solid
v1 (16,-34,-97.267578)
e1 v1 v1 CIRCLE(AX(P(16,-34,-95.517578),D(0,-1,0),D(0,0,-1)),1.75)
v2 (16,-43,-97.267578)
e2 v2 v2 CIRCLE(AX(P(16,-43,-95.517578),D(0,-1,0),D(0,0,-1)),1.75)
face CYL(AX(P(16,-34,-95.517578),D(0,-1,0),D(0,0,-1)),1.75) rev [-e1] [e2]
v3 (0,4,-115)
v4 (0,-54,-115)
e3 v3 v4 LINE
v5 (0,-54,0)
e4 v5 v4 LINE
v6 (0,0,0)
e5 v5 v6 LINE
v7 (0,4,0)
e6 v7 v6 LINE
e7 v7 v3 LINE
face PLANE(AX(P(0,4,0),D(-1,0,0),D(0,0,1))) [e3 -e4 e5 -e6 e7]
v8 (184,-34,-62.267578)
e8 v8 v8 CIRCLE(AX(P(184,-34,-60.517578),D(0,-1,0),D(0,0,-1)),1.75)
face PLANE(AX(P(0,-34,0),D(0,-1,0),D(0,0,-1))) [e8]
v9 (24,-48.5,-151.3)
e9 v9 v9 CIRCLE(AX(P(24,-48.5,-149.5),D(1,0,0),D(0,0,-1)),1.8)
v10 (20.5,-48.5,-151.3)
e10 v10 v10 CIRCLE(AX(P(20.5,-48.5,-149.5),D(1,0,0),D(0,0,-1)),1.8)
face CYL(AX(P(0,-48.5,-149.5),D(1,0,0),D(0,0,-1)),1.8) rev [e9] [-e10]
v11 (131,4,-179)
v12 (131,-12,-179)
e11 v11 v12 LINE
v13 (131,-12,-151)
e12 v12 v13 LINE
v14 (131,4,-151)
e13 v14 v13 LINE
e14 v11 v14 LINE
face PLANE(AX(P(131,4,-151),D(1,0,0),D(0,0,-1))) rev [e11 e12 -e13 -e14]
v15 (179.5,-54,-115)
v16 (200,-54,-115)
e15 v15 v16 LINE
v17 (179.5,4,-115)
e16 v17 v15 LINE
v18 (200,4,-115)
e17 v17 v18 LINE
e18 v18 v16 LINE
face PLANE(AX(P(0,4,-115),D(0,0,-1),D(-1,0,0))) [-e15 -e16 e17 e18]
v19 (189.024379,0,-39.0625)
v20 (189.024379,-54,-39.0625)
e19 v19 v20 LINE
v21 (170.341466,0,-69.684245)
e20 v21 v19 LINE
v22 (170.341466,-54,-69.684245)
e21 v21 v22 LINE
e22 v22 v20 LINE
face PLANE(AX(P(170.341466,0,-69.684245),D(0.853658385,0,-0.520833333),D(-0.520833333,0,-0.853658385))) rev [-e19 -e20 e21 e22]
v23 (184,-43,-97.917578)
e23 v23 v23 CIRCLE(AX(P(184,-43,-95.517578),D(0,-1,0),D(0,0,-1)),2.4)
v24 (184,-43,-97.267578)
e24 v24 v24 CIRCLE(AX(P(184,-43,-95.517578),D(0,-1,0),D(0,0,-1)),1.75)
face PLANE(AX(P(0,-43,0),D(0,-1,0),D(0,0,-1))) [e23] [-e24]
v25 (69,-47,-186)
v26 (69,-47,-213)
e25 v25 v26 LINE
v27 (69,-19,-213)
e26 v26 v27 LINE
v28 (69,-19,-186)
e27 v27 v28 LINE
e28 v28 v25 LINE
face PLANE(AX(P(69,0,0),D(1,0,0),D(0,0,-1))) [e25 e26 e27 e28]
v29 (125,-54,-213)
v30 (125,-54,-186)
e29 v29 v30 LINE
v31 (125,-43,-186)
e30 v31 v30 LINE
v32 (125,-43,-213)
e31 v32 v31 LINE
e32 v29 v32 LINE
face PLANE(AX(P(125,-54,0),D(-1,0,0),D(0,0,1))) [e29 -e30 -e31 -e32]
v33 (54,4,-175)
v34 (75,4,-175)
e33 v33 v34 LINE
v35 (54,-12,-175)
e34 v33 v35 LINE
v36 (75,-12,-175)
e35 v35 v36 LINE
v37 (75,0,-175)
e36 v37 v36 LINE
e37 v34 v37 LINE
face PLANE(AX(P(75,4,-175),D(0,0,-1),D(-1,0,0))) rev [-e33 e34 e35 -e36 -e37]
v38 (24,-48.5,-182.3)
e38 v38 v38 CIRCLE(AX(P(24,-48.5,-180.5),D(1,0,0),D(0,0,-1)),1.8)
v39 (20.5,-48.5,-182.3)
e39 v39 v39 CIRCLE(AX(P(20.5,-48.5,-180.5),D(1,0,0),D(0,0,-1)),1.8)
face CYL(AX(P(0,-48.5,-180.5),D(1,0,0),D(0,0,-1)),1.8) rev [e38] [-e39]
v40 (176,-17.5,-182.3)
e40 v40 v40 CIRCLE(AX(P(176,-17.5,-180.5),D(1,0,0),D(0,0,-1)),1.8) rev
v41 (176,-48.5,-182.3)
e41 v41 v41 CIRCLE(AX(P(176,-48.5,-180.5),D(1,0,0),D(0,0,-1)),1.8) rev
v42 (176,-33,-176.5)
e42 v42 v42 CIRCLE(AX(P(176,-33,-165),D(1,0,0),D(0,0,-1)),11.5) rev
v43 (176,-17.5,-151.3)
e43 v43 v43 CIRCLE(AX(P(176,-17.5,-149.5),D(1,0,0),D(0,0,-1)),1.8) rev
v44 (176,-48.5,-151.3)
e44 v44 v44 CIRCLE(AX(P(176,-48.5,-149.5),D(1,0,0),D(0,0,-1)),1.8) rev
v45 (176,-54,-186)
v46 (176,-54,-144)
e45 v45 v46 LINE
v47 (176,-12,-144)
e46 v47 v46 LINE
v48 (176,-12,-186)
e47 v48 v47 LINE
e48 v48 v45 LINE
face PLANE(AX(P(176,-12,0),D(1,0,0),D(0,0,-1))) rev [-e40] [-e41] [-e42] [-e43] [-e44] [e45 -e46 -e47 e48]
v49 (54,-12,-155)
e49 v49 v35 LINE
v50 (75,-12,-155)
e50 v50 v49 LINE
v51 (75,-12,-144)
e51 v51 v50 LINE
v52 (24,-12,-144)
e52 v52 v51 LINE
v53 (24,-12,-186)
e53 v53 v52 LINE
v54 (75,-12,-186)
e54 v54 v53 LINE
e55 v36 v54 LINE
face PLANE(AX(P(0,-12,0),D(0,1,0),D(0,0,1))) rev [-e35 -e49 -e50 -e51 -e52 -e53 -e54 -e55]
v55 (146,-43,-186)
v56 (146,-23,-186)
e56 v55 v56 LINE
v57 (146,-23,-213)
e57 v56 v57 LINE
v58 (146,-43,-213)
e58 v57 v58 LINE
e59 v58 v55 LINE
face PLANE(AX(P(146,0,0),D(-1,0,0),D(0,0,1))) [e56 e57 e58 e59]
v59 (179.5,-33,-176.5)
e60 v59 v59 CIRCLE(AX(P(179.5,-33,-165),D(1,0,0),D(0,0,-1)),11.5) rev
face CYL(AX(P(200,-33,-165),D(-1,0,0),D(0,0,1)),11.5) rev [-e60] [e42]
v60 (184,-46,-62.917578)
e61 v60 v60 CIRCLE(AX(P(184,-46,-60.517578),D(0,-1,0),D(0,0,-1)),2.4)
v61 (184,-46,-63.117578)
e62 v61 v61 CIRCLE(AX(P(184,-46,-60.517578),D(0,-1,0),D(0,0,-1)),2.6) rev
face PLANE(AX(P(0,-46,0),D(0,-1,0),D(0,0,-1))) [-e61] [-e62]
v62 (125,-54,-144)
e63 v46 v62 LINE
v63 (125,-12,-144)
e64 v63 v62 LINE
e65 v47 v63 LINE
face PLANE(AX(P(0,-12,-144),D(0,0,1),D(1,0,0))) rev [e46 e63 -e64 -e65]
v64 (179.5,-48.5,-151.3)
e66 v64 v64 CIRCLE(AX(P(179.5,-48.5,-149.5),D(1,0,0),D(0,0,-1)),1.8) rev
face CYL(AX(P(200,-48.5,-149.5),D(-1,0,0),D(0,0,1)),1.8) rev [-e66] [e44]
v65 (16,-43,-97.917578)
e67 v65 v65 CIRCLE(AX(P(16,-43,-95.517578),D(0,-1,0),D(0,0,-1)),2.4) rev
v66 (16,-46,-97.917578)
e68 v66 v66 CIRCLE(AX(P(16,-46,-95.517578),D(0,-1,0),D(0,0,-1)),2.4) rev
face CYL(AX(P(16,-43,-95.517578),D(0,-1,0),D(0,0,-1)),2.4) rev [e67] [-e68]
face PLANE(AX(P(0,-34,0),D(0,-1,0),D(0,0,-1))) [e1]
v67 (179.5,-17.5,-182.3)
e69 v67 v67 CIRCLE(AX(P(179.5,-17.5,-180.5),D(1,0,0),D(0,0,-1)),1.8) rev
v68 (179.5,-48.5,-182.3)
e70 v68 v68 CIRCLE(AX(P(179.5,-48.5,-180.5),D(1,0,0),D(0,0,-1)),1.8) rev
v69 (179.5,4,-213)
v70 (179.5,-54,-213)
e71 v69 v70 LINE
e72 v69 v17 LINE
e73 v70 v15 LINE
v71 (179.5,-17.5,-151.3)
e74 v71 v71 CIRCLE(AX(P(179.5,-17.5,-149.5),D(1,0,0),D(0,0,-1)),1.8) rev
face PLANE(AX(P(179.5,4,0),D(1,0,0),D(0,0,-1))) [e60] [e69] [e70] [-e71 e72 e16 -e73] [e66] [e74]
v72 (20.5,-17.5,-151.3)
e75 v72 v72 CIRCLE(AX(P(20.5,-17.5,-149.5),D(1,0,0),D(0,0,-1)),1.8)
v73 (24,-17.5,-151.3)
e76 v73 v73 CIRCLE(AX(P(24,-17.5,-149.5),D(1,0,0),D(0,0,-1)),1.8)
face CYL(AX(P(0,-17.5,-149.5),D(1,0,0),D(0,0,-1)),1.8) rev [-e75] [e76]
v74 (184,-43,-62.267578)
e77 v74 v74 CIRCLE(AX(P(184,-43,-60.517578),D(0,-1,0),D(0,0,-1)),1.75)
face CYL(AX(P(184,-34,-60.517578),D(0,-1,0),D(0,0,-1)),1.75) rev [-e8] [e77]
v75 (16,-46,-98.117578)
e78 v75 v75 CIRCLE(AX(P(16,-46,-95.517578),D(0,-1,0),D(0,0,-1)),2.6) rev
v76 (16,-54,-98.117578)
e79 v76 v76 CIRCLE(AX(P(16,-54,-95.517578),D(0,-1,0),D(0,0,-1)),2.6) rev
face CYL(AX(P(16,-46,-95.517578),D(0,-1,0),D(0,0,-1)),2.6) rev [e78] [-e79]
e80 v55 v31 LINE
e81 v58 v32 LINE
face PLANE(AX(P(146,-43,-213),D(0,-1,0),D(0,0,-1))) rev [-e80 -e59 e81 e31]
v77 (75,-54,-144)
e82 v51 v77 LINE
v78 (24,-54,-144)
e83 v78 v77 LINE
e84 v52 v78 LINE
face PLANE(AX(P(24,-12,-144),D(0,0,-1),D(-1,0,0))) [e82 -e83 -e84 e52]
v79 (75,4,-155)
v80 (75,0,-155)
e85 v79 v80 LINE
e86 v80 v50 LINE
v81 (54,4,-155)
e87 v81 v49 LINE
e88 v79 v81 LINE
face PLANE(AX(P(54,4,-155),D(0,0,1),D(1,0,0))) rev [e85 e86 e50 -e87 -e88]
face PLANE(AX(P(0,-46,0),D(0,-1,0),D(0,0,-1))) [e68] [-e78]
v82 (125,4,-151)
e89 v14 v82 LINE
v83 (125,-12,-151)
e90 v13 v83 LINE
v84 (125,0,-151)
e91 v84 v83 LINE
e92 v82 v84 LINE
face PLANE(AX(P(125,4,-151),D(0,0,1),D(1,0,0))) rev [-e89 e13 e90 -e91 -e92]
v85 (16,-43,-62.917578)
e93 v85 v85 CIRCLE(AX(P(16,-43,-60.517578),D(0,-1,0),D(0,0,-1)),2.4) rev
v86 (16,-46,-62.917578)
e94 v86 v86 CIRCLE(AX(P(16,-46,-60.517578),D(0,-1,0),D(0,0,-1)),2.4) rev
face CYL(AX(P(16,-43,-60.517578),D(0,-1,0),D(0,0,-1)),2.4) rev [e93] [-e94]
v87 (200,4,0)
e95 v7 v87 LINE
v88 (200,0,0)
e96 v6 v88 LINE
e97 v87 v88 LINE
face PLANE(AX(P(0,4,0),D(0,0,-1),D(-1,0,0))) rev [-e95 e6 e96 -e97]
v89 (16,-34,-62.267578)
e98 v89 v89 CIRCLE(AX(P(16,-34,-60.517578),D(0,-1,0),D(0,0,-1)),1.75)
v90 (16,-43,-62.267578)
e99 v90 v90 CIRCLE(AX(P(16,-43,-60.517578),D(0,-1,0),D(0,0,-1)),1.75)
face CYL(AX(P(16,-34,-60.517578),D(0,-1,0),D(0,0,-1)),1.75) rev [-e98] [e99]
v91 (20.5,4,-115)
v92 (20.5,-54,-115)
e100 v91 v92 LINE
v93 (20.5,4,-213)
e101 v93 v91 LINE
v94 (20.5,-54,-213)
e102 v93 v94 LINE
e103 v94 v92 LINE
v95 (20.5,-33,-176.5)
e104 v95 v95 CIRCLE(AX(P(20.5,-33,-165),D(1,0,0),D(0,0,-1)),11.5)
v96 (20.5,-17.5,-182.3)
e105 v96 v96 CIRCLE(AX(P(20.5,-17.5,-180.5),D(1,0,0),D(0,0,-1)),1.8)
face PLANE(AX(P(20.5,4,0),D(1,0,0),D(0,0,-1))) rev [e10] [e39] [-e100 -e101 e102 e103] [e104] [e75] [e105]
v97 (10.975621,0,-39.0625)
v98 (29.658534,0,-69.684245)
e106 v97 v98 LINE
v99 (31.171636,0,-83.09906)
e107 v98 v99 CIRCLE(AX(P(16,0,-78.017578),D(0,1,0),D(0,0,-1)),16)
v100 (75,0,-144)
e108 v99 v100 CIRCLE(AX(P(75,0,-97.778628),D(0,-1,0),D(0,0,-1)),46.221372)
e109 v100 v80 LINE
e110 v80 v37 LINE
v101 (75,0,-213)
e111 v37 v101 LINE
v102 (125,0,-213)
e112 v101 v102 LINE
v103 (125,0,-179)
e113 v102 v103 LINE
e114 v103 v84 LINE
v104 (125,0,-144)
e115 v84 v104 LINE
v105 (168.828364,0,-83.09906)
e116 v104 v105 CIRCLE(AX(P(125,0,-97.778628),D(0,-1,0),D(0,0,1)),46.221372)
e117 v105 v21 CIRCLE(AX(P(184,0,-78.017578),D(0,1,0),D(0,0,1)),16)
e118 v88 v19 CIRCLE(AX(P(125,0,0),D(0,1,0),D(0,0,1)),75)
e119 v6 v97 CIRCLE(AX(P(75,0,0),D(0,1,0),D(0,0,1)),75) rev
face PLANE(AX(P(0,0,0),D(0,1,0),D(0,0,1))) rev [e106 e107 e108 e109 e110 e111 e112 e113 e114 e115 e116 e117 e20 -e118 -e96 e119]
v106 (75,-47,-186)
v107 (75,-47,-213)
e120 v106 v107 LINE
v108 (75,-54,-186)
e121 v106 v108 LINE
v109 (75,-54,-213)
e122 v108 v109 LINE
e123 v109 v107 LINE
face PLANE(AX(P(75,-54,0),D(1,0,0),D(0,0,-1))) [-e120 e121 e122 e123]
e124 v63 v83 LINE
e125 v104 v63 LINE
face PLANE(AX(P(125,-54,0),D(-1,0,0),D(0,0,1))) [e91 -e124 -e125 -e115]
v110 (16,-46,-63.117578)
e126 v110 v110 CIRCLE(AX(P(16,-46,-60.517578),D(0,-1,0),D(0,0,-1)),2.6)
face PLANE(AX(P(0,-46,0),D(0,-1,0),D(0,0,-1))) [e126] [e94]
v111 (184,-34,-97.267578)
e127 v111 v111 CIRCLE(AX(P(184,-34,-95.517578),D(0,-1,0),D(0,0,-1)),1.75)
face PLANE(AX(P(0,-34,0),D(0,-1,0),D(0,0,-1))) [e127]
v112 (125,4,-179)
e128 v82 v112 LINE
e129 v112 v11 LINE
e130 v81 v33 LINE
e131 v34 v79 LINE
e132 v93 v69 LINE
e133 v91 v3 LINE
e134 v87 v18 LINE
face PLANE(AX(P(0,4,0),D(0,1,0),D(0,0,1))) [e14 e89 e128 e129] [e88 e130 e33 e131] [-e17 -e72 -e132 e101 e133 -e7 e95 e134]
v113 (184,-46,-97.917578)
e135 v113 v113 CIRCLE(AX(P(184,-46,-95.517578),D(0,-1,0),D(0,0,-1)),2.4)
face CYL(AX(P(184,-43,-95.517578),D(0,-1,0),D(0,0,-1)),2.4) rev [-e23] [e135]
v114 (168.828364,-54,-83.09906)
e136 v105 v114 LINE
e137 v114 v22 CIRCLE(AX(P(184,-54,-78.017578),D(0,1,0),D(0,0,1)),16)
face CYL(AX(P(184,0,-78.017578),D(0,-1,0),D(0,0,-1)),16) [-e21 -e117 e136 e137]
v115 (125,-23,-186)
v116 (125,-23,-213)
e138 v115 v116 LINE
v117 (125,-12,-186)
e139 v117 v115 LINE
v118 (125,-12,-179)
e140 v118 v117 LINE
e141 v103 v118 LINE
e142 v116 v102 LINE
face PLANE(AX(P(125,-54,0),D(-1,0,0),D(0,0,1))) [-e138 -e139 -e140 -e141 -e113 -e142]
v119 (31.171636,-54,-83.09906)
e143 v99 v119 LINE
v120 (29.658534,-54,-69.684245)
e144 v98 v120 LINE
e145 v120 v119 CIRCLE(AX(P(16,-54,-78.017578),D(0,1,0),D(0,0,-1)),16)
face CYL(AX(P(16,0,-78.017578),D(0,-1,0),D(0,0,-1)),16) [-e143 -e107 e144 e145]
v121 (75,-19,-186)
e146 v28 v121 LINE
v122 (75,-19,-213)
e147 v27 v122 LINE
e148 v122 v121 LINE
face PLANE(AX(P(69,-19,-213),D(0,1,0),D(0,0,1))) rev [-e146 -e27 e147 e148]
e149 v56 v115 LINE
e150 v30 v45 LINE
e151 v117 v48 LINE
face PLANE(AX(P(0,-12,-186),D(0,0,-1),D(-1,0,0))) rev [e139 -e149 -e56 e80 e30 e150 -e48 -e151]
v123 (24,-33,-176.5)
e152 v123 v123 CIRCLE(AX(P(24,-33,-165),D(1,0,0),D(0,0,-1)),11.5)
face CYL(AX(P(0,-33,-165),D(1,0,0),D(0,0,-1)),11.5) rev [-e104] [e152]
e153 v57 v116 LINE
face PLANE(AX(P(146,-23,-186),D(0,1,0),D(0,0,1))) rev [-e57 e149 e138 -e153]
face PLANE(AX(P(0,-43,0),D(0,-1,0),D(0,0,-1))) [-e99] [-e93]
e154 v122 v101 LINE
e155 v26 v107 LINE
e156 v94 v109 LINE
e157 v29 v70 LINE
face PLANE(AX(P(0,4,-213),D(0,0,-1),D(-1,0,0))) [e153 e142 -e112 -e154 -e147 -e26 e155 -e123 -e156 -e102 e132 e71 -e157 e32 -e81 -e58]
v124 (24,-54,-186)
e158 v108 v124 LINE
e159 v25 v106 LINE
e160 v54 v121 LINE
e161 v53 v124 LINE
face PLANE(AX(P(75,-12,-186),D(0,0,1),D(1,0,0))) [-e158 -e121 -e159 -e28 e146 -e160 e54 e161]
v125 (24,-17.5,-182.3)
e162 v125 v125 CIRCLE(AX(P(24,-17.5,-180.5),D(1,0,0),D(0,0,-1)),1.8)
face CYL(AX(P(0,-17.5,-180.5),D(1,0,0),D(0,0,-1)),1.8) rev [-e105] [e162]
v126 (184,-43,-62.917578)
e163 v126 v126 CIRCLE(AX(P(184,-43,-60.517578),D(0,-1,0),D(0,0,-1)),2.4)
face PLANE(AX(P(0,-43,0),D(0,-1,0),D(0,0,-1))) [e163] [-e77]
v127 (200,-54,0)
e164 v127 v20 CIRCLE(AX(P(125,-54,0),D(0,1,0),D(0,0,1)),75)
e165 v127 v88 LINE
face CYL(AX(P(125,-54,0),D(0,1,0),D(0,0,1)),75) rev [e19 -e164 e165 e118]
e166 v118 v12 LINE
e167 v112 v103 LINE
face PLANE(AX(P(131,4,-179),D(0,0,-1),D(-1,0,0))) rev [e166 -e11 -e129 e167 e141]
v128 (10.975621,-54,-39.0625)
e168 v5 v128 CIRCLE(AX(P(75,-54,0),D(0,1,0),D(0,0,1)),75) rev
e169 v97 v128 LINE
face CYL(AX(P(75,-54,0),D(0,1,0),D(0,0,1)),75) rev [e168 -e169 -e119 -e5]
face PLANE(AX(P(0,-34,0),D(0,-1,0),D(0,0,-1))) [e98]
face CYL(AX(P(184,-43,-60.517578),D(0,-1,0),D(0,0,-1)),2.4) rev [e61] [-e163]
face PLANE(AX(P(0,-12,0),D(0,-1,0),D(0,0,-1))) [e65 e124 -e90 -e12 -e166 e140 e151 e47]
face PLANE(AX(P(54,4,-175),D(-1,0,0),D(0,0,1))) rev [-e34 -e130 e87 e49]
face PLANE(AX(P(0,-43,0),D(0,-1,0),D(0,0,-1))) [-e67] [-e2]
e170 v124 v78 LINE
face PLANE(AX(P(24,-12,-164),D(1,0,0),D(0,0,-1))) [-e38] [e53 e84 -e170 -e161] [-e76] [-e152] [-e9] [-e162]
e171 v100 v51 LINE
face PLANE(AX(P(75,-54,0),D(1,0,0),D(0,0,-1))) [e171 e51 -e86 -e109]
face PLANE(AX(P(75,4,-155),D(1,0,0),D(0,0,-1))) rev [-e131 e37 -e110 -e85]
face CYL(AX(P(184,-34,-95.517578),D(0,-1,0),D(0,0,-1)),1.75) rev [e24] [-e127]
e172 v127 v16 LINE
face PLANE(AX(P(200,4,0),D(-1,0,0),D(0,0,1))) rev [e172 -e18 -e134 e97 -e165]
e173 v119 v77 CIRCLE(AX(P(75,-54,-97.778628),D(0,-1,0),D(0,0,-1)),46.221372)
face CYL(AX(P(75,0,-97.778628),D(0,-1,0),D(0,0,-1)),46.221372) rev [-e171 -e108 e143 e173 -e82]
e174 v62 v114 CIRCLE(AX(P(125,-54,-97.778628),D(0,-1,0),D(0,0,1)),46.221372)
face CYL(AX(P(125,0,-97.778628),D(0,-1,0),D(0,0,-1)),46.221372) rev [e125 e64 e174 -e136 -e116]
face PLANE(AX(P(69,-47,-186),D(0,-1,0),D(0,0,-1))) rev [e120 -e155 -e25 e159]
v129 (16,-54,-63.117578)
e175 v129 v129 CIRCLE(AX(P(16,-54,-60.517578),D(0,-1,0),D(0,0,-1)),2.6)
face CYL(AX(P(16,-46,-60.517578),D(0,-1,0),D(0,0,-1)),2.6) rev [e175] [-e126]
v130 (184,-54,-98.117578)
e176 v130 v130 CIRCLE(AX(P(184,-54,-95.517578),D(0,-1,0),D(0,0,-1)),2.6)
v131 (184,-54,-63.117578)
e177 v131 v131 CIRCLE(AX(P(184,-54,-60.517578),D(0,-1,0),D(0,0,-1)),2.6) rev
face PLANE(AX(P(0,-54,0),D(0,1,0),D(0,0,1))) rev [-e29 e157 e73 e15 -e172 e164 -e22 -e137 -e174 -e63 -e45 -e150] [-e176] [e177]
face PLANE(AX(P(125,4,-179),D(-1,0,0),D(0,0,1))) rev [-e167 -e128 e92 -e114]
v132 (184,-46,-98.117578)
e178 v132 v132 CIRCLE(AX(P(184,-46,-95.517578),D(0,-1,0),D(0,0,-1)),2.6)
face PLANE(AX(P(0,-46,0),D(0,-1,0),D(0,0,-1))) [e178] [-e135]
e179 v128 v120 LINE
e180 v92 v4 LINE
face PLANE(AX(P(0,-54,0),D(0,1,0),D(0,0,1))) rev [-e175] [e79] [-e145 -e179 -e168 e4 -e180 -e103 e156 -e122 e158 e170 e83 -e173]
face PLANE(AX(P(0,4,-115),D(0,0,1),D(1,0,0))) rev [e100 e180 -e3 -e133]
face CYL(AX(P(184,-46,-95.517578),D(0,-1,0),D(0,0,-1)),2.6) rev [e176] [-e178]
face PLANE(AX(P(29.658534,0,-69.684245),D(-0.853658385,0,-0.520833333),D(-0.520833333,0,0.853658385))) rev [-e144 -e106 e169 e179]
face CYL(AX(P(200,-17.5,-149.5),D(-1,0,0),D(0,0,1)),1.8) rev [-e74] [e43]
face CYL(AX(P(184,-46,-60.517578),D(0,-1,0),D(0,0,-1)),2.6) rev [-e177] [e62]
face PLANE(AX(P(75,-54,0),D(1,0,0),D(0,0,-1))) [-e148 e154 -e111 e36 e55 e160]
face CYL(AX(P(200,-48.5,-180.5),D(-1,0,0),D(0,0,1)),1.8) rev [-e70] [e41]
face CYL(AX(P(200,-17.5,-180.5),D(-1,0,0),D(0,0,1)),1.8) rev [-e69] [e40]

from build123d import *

# Parameters (mm, degrees)
SKETCH_1_W           = 200
SKETCH_1_H           = 213
EXTRUDE_1_DEPTH      = 4
EXTRUDE_2_DEPTH      = 54
CUT_EXTRUDE_2_DEPTH  = 298.880848663
CUT_EXTRUDE_3_DEPTH  = 42
SKETCH_7_R           = 1.8
SKETCH_7_R_2         = 11.5
CUT_EXTRUDE_4_DEPTH  = 282.53330176
MIRROR_START         = 176
MIRROR_1_OUTLINE_R   = 1.8
MIRROR_1_OUTLINE_R_2 = 11.5
MIRROR_1_DEPTH       = 3.5
SKETCH_8_W           = 27
SKETCH_8_H           = 28
CUT_EXTRUDE_5_DEPTH  = 6
SKETCH_9_W           = 27
SKETCH_9_H           = 20
CUT_EXTRUDE_6_DEPTH  = 21
CUT_EXTRUDE_START    = -54
CUT_EXTRUDE_7_DEPTH  = 54
SKETCH_14_W          = 21
SKETCH_14_H          = 20
CUT_EXTRUDE_8_DEPTH  = 296.18299409
SKETCH_15_W          = 6
SKETCH_15_H          = 28
CUT_EXTRUDE_9_DEPTH  = 296.18299409
SKETCH_12_R          = 2.6
CUT_EXTRUDE_10_DEPTH = 8
SKETCH_16_R          = 2.4
CUT_EXTRUDE_11_DEPTH = 3
SKETCH_17_R          = 1.75
CUT_EXTRUDE_12_DEPTH = 20


# Read off the part's stored shape, not the designer's step: 镜向1
with BuildPart() as part:
    # 草图1 → 凸台-拉伸1 (new body)
    with BuildSketch(Plane(origin=(0, 0, 0), x_dir=(1, 0, 0), z_dir=(0, 1, 0))):
        with Locations((100, 106.5)):
            Rectangle(SKETCH_1_W, SKETCH_1_H)
    extrude(amount=EXTRUDE_1_DEPTH)

    # 草图1<4> → 凸台-拉伸2 (add)
    with BuildSketch(Plane(origin=(0, 0, 0), x_dir=(1, 0, 0), z_dir=(0, 1, 0))):
        with BuildLine():
            Line((0, 213), (0, 0))
            ThreePointArc((0, 0), (21.966991411, 53.033008589), (75, 75))
            Line((75, 75), (75, 213))
            Line((75, 213), (0, 213))
        make_face()
        with BuildLine():
            Line((125, 213), (125, 75))
            ThreePointArc((125, 75), (178.033008589, 53.033008589), (200, 0))
            Line((200, 0), (200, 213))
            Line((200, 213), (125, 213))
        make_face()
    extrude(amount=-EXTRUDE_2_DEPTH)

    # 草图3 → 切除-拉伸2 (cut, through all)
    with BuildSketch(Plane.XZ.offset(54)):
        Polygon((20.5, -186), (20.5, -165), (20.5, -144), (20.5, -115), (0, -115), (0, -213), (20.5, -213), align=None)
        Polygon((179.5, -115), (200, -115), (200, -213), (179.5, -213), (179.5, -165), align=None)
    extrude(amount=-CUT_EXTRUDE_2_DEPTH, mode=Mode.SUBTRACT)

    # 草图5 → 切除-拉伸3 (cut)
    with BuildSketch(Plane.XZ.offset(54)):
        Polygon((176, -164), (176, -144), (125, -144), (125, -186), (176, -186), align=None)
        Polygon((24, -164), (24, -144), (75, -144), (75, -186), (24, -186), align=None)
    extrude(amount=-CUT_EXTRUDE_3_DEPTH, mode=Mode.SUBTRACT)

    # 草图7 → 切除-拉伸4 (cut, through all)
    with BuildSketch(Plane(origin=(24, 0, 0), x_dir=(0, 0, -1), z_dir=(1, 0, 0))):
        with Locations((180.5, -17.5)):
            Circle(SKETCH_7_R)
        with Locations((149.5, -17.5)):
            Circle(SKETCH_7_R)
        with Locations((165, -33)):
            Circle(SKETCH_7_R_2)
        with Locations((180.5, -48.5)):
            Circle(SKETCH_7_R)
        with Locations((149.5, -48.5)):
            Circle(SKETCH_7_R)
    extrude(amount=-CUT_EXTRUDE_4_DEPTH, mode=Mode.SUBTRACT)

    # 镜向1 outline → 镜向1 (cut)
    with BuildSketch(Plane.YZ.offset(MIRROR_START)):
        with Locations((-17.5, -180.5)):
            Circle(MIRROR_1_OUTLINE_R)
        with Locations((-17.5, -149.5)):
            Circle(MIRROR_1_OUTLINE_R)
        with Locations((-33, -165)):
            Circle(MIRROR_1_OUTLINE_R_2)
        with Locations((-48.5, -180.5)):
            Circle(MIRROR_1_OUTLINE_R)
        with Locations((-48.5, -149.5)):
            Circle(MIRROR_1_OUTLINE_R)
    extrude(amount=MIRROR_1_DEPTH, mode=Mode.SUBTRACT)

    # 草图8 → 切除-拉伸5 (cut)
    with BuildSketch(Plane(origin=(75, 0, 0), x_dir=(0, 0, -1), z_dir=(1, 0, 0))):
        with Locations((199.5, -33)):
            Rectangle(SKETCH_8_W, SKETCH_8_H)
    extrude(amount=-CUT_EXTRUDE_5_DEPTH, mode=Mode.SUBTRACT)

    # 草图9 → 切除-拉伸6 (cut)
    with BuildSketch(Plane.ZY.offset(-125)):
        with Locations((-199.5, -33)):
            Rectangle(SKETCH_9_W, SKETCH_9_H)
    extrude(amount=-CUT_EXTRUDE_6_DEPTH, mode=Mode.SUBTRACT)

    # 草图11 → 切除-拉伸7 (cut)
    with BuildSketch(Plane.XZ.offset(54).offset(CUT_EXTRUDE_START)):
        with BuildLine():
            Line((29.658534166, -69.684244774), (10.975621098, -39.0625))
            ThreePointArc((10.975621098, -39.0625), (38.289562111, -65.401404801), (75, -75))
            Line((75, -75), (75, -144))
            ThreePointArc((75, -144), (37.483837038, -124.777752739), (31.171635941, -83.099060455))
            ThreePointArc((31.171635941, -83.099060455), (31.899182276, -76.224256342), (29.658534166, -69.684244774))
        make_face()
        with BuildLine():
            Line((125, -144), (125, -75))
            ThreePointArc((125, -75), (161.710437889, -65.401404801), (189.024378902, -39.0625))
            Line((189.024378902, -39.0625), (170.341465834, -69.684244774))
            ThreePointArc((170.341465834, -69.684244774), (168.100817724, -76.224256342), (168.828364059, -83.099060455))
            ThreePointArc((168.828364059, -83.099060455), (162.516162962, -124.777752739), (125, -144))
        make_face()
    extrude(amount=CUT_EXTRUDE_7_DEPTH, mode=Mode.SUBTRACT)

    # 草图14 → 切除-拉伸8 (cut, through all)
    with BuildSketch(Plane.XZ.offset(12)):
        with Locations((64.5, -165)):
            Rectangle(SKETCH_14_W, SKETCH_14_H)
    extrude(amount=-CUT_EXTRUDE_8_DEPTH, mode=Mode.SUBTRACT)

    # 草图15 → 切除-拉伸9 (cut, through all)
    with BuildSketch(Plane.XZ.offset(12)):
        with Locations((128, -165)):
            Rectangle(SKETCH_15_W, SKETCH_15_H)
    extrude(amount=-CUT_EXTRUDE_9_DEPTH, mode=Mode.SUBTRACT)

    # 草图12 → 切除-拉伸10 (cut)
    with BuildSketch(Plane.XZ.offset(54)):
        with Locations(Location((16, -60.517578107, 0), (0, 0, 270))):
            Circle(SKETCH_12_R)
        with Locations(Location((16, -95.517578107, 0), (0, 0, 270))):
            Circle(SKETCH_12_R)
        with Locations(Location((184, -60.517578107, 0), (0, 0, 270))):
            Circle(SKETCH_12_R)
        with Locations(Location((184, -95.517578107, 0), (0, 0, 270))):
            Circle(SKETCH_12_R)
    extrude(amount=-CUT_EXTRUDE_10_DEPTH, mode=Mode.SUBTRACT)

    # 草图16 → 切除-拉伸11 (cut)
    with BuildSketch(Plane.XZ.offset(46)):
        with Locations(Location((184, -95.517578107, 0), (0, 0, 270))):
            Circle(SKETCH_16_R)
        with Locations(Location((184, -60.517578107, 0), (0, 0, 270))):
            Circle(SKETCH_16_R)
        with Locations(Location((16, -60.517578107, 0), (0, 0, 270))):
            Circle(SKETCH_16_R)
        with Locations(Location((16, -95.517578107, 0), (0, 0, 270))):
            Circle(SKETCH_16_R)
    extrude(amount=-CUT_EXTRUDE_11_DEPTH, mode=Mode.SUBTRACT)

    # 草图17 → 切除-拉伸12 (cut)
    with BuildSketch(Plane.XZ.offset(54)):
        with Locations(Location((16, -60.517578107, 0), (0, 0, 270))):
            Circle(SKETCH_17_R)
        with Locations(Location((16, -95.517578107, 0), (0, 0, 270))):
            Circle(SKETCH_17_R)
        with Locations(Location((184, -95.517578107, 0), (0, 0, 270))):
            Circle(SKETCH_17_R)
        with Locations(Location((184, -60.517578107, 0), (0, 0, 270))):
            Circle(SKETCH_17_R)
    extrude(amount=-CUT_EXTRUDE_12_DEPTH, mode=Mode.SUBTRACT)


solid = part.part
